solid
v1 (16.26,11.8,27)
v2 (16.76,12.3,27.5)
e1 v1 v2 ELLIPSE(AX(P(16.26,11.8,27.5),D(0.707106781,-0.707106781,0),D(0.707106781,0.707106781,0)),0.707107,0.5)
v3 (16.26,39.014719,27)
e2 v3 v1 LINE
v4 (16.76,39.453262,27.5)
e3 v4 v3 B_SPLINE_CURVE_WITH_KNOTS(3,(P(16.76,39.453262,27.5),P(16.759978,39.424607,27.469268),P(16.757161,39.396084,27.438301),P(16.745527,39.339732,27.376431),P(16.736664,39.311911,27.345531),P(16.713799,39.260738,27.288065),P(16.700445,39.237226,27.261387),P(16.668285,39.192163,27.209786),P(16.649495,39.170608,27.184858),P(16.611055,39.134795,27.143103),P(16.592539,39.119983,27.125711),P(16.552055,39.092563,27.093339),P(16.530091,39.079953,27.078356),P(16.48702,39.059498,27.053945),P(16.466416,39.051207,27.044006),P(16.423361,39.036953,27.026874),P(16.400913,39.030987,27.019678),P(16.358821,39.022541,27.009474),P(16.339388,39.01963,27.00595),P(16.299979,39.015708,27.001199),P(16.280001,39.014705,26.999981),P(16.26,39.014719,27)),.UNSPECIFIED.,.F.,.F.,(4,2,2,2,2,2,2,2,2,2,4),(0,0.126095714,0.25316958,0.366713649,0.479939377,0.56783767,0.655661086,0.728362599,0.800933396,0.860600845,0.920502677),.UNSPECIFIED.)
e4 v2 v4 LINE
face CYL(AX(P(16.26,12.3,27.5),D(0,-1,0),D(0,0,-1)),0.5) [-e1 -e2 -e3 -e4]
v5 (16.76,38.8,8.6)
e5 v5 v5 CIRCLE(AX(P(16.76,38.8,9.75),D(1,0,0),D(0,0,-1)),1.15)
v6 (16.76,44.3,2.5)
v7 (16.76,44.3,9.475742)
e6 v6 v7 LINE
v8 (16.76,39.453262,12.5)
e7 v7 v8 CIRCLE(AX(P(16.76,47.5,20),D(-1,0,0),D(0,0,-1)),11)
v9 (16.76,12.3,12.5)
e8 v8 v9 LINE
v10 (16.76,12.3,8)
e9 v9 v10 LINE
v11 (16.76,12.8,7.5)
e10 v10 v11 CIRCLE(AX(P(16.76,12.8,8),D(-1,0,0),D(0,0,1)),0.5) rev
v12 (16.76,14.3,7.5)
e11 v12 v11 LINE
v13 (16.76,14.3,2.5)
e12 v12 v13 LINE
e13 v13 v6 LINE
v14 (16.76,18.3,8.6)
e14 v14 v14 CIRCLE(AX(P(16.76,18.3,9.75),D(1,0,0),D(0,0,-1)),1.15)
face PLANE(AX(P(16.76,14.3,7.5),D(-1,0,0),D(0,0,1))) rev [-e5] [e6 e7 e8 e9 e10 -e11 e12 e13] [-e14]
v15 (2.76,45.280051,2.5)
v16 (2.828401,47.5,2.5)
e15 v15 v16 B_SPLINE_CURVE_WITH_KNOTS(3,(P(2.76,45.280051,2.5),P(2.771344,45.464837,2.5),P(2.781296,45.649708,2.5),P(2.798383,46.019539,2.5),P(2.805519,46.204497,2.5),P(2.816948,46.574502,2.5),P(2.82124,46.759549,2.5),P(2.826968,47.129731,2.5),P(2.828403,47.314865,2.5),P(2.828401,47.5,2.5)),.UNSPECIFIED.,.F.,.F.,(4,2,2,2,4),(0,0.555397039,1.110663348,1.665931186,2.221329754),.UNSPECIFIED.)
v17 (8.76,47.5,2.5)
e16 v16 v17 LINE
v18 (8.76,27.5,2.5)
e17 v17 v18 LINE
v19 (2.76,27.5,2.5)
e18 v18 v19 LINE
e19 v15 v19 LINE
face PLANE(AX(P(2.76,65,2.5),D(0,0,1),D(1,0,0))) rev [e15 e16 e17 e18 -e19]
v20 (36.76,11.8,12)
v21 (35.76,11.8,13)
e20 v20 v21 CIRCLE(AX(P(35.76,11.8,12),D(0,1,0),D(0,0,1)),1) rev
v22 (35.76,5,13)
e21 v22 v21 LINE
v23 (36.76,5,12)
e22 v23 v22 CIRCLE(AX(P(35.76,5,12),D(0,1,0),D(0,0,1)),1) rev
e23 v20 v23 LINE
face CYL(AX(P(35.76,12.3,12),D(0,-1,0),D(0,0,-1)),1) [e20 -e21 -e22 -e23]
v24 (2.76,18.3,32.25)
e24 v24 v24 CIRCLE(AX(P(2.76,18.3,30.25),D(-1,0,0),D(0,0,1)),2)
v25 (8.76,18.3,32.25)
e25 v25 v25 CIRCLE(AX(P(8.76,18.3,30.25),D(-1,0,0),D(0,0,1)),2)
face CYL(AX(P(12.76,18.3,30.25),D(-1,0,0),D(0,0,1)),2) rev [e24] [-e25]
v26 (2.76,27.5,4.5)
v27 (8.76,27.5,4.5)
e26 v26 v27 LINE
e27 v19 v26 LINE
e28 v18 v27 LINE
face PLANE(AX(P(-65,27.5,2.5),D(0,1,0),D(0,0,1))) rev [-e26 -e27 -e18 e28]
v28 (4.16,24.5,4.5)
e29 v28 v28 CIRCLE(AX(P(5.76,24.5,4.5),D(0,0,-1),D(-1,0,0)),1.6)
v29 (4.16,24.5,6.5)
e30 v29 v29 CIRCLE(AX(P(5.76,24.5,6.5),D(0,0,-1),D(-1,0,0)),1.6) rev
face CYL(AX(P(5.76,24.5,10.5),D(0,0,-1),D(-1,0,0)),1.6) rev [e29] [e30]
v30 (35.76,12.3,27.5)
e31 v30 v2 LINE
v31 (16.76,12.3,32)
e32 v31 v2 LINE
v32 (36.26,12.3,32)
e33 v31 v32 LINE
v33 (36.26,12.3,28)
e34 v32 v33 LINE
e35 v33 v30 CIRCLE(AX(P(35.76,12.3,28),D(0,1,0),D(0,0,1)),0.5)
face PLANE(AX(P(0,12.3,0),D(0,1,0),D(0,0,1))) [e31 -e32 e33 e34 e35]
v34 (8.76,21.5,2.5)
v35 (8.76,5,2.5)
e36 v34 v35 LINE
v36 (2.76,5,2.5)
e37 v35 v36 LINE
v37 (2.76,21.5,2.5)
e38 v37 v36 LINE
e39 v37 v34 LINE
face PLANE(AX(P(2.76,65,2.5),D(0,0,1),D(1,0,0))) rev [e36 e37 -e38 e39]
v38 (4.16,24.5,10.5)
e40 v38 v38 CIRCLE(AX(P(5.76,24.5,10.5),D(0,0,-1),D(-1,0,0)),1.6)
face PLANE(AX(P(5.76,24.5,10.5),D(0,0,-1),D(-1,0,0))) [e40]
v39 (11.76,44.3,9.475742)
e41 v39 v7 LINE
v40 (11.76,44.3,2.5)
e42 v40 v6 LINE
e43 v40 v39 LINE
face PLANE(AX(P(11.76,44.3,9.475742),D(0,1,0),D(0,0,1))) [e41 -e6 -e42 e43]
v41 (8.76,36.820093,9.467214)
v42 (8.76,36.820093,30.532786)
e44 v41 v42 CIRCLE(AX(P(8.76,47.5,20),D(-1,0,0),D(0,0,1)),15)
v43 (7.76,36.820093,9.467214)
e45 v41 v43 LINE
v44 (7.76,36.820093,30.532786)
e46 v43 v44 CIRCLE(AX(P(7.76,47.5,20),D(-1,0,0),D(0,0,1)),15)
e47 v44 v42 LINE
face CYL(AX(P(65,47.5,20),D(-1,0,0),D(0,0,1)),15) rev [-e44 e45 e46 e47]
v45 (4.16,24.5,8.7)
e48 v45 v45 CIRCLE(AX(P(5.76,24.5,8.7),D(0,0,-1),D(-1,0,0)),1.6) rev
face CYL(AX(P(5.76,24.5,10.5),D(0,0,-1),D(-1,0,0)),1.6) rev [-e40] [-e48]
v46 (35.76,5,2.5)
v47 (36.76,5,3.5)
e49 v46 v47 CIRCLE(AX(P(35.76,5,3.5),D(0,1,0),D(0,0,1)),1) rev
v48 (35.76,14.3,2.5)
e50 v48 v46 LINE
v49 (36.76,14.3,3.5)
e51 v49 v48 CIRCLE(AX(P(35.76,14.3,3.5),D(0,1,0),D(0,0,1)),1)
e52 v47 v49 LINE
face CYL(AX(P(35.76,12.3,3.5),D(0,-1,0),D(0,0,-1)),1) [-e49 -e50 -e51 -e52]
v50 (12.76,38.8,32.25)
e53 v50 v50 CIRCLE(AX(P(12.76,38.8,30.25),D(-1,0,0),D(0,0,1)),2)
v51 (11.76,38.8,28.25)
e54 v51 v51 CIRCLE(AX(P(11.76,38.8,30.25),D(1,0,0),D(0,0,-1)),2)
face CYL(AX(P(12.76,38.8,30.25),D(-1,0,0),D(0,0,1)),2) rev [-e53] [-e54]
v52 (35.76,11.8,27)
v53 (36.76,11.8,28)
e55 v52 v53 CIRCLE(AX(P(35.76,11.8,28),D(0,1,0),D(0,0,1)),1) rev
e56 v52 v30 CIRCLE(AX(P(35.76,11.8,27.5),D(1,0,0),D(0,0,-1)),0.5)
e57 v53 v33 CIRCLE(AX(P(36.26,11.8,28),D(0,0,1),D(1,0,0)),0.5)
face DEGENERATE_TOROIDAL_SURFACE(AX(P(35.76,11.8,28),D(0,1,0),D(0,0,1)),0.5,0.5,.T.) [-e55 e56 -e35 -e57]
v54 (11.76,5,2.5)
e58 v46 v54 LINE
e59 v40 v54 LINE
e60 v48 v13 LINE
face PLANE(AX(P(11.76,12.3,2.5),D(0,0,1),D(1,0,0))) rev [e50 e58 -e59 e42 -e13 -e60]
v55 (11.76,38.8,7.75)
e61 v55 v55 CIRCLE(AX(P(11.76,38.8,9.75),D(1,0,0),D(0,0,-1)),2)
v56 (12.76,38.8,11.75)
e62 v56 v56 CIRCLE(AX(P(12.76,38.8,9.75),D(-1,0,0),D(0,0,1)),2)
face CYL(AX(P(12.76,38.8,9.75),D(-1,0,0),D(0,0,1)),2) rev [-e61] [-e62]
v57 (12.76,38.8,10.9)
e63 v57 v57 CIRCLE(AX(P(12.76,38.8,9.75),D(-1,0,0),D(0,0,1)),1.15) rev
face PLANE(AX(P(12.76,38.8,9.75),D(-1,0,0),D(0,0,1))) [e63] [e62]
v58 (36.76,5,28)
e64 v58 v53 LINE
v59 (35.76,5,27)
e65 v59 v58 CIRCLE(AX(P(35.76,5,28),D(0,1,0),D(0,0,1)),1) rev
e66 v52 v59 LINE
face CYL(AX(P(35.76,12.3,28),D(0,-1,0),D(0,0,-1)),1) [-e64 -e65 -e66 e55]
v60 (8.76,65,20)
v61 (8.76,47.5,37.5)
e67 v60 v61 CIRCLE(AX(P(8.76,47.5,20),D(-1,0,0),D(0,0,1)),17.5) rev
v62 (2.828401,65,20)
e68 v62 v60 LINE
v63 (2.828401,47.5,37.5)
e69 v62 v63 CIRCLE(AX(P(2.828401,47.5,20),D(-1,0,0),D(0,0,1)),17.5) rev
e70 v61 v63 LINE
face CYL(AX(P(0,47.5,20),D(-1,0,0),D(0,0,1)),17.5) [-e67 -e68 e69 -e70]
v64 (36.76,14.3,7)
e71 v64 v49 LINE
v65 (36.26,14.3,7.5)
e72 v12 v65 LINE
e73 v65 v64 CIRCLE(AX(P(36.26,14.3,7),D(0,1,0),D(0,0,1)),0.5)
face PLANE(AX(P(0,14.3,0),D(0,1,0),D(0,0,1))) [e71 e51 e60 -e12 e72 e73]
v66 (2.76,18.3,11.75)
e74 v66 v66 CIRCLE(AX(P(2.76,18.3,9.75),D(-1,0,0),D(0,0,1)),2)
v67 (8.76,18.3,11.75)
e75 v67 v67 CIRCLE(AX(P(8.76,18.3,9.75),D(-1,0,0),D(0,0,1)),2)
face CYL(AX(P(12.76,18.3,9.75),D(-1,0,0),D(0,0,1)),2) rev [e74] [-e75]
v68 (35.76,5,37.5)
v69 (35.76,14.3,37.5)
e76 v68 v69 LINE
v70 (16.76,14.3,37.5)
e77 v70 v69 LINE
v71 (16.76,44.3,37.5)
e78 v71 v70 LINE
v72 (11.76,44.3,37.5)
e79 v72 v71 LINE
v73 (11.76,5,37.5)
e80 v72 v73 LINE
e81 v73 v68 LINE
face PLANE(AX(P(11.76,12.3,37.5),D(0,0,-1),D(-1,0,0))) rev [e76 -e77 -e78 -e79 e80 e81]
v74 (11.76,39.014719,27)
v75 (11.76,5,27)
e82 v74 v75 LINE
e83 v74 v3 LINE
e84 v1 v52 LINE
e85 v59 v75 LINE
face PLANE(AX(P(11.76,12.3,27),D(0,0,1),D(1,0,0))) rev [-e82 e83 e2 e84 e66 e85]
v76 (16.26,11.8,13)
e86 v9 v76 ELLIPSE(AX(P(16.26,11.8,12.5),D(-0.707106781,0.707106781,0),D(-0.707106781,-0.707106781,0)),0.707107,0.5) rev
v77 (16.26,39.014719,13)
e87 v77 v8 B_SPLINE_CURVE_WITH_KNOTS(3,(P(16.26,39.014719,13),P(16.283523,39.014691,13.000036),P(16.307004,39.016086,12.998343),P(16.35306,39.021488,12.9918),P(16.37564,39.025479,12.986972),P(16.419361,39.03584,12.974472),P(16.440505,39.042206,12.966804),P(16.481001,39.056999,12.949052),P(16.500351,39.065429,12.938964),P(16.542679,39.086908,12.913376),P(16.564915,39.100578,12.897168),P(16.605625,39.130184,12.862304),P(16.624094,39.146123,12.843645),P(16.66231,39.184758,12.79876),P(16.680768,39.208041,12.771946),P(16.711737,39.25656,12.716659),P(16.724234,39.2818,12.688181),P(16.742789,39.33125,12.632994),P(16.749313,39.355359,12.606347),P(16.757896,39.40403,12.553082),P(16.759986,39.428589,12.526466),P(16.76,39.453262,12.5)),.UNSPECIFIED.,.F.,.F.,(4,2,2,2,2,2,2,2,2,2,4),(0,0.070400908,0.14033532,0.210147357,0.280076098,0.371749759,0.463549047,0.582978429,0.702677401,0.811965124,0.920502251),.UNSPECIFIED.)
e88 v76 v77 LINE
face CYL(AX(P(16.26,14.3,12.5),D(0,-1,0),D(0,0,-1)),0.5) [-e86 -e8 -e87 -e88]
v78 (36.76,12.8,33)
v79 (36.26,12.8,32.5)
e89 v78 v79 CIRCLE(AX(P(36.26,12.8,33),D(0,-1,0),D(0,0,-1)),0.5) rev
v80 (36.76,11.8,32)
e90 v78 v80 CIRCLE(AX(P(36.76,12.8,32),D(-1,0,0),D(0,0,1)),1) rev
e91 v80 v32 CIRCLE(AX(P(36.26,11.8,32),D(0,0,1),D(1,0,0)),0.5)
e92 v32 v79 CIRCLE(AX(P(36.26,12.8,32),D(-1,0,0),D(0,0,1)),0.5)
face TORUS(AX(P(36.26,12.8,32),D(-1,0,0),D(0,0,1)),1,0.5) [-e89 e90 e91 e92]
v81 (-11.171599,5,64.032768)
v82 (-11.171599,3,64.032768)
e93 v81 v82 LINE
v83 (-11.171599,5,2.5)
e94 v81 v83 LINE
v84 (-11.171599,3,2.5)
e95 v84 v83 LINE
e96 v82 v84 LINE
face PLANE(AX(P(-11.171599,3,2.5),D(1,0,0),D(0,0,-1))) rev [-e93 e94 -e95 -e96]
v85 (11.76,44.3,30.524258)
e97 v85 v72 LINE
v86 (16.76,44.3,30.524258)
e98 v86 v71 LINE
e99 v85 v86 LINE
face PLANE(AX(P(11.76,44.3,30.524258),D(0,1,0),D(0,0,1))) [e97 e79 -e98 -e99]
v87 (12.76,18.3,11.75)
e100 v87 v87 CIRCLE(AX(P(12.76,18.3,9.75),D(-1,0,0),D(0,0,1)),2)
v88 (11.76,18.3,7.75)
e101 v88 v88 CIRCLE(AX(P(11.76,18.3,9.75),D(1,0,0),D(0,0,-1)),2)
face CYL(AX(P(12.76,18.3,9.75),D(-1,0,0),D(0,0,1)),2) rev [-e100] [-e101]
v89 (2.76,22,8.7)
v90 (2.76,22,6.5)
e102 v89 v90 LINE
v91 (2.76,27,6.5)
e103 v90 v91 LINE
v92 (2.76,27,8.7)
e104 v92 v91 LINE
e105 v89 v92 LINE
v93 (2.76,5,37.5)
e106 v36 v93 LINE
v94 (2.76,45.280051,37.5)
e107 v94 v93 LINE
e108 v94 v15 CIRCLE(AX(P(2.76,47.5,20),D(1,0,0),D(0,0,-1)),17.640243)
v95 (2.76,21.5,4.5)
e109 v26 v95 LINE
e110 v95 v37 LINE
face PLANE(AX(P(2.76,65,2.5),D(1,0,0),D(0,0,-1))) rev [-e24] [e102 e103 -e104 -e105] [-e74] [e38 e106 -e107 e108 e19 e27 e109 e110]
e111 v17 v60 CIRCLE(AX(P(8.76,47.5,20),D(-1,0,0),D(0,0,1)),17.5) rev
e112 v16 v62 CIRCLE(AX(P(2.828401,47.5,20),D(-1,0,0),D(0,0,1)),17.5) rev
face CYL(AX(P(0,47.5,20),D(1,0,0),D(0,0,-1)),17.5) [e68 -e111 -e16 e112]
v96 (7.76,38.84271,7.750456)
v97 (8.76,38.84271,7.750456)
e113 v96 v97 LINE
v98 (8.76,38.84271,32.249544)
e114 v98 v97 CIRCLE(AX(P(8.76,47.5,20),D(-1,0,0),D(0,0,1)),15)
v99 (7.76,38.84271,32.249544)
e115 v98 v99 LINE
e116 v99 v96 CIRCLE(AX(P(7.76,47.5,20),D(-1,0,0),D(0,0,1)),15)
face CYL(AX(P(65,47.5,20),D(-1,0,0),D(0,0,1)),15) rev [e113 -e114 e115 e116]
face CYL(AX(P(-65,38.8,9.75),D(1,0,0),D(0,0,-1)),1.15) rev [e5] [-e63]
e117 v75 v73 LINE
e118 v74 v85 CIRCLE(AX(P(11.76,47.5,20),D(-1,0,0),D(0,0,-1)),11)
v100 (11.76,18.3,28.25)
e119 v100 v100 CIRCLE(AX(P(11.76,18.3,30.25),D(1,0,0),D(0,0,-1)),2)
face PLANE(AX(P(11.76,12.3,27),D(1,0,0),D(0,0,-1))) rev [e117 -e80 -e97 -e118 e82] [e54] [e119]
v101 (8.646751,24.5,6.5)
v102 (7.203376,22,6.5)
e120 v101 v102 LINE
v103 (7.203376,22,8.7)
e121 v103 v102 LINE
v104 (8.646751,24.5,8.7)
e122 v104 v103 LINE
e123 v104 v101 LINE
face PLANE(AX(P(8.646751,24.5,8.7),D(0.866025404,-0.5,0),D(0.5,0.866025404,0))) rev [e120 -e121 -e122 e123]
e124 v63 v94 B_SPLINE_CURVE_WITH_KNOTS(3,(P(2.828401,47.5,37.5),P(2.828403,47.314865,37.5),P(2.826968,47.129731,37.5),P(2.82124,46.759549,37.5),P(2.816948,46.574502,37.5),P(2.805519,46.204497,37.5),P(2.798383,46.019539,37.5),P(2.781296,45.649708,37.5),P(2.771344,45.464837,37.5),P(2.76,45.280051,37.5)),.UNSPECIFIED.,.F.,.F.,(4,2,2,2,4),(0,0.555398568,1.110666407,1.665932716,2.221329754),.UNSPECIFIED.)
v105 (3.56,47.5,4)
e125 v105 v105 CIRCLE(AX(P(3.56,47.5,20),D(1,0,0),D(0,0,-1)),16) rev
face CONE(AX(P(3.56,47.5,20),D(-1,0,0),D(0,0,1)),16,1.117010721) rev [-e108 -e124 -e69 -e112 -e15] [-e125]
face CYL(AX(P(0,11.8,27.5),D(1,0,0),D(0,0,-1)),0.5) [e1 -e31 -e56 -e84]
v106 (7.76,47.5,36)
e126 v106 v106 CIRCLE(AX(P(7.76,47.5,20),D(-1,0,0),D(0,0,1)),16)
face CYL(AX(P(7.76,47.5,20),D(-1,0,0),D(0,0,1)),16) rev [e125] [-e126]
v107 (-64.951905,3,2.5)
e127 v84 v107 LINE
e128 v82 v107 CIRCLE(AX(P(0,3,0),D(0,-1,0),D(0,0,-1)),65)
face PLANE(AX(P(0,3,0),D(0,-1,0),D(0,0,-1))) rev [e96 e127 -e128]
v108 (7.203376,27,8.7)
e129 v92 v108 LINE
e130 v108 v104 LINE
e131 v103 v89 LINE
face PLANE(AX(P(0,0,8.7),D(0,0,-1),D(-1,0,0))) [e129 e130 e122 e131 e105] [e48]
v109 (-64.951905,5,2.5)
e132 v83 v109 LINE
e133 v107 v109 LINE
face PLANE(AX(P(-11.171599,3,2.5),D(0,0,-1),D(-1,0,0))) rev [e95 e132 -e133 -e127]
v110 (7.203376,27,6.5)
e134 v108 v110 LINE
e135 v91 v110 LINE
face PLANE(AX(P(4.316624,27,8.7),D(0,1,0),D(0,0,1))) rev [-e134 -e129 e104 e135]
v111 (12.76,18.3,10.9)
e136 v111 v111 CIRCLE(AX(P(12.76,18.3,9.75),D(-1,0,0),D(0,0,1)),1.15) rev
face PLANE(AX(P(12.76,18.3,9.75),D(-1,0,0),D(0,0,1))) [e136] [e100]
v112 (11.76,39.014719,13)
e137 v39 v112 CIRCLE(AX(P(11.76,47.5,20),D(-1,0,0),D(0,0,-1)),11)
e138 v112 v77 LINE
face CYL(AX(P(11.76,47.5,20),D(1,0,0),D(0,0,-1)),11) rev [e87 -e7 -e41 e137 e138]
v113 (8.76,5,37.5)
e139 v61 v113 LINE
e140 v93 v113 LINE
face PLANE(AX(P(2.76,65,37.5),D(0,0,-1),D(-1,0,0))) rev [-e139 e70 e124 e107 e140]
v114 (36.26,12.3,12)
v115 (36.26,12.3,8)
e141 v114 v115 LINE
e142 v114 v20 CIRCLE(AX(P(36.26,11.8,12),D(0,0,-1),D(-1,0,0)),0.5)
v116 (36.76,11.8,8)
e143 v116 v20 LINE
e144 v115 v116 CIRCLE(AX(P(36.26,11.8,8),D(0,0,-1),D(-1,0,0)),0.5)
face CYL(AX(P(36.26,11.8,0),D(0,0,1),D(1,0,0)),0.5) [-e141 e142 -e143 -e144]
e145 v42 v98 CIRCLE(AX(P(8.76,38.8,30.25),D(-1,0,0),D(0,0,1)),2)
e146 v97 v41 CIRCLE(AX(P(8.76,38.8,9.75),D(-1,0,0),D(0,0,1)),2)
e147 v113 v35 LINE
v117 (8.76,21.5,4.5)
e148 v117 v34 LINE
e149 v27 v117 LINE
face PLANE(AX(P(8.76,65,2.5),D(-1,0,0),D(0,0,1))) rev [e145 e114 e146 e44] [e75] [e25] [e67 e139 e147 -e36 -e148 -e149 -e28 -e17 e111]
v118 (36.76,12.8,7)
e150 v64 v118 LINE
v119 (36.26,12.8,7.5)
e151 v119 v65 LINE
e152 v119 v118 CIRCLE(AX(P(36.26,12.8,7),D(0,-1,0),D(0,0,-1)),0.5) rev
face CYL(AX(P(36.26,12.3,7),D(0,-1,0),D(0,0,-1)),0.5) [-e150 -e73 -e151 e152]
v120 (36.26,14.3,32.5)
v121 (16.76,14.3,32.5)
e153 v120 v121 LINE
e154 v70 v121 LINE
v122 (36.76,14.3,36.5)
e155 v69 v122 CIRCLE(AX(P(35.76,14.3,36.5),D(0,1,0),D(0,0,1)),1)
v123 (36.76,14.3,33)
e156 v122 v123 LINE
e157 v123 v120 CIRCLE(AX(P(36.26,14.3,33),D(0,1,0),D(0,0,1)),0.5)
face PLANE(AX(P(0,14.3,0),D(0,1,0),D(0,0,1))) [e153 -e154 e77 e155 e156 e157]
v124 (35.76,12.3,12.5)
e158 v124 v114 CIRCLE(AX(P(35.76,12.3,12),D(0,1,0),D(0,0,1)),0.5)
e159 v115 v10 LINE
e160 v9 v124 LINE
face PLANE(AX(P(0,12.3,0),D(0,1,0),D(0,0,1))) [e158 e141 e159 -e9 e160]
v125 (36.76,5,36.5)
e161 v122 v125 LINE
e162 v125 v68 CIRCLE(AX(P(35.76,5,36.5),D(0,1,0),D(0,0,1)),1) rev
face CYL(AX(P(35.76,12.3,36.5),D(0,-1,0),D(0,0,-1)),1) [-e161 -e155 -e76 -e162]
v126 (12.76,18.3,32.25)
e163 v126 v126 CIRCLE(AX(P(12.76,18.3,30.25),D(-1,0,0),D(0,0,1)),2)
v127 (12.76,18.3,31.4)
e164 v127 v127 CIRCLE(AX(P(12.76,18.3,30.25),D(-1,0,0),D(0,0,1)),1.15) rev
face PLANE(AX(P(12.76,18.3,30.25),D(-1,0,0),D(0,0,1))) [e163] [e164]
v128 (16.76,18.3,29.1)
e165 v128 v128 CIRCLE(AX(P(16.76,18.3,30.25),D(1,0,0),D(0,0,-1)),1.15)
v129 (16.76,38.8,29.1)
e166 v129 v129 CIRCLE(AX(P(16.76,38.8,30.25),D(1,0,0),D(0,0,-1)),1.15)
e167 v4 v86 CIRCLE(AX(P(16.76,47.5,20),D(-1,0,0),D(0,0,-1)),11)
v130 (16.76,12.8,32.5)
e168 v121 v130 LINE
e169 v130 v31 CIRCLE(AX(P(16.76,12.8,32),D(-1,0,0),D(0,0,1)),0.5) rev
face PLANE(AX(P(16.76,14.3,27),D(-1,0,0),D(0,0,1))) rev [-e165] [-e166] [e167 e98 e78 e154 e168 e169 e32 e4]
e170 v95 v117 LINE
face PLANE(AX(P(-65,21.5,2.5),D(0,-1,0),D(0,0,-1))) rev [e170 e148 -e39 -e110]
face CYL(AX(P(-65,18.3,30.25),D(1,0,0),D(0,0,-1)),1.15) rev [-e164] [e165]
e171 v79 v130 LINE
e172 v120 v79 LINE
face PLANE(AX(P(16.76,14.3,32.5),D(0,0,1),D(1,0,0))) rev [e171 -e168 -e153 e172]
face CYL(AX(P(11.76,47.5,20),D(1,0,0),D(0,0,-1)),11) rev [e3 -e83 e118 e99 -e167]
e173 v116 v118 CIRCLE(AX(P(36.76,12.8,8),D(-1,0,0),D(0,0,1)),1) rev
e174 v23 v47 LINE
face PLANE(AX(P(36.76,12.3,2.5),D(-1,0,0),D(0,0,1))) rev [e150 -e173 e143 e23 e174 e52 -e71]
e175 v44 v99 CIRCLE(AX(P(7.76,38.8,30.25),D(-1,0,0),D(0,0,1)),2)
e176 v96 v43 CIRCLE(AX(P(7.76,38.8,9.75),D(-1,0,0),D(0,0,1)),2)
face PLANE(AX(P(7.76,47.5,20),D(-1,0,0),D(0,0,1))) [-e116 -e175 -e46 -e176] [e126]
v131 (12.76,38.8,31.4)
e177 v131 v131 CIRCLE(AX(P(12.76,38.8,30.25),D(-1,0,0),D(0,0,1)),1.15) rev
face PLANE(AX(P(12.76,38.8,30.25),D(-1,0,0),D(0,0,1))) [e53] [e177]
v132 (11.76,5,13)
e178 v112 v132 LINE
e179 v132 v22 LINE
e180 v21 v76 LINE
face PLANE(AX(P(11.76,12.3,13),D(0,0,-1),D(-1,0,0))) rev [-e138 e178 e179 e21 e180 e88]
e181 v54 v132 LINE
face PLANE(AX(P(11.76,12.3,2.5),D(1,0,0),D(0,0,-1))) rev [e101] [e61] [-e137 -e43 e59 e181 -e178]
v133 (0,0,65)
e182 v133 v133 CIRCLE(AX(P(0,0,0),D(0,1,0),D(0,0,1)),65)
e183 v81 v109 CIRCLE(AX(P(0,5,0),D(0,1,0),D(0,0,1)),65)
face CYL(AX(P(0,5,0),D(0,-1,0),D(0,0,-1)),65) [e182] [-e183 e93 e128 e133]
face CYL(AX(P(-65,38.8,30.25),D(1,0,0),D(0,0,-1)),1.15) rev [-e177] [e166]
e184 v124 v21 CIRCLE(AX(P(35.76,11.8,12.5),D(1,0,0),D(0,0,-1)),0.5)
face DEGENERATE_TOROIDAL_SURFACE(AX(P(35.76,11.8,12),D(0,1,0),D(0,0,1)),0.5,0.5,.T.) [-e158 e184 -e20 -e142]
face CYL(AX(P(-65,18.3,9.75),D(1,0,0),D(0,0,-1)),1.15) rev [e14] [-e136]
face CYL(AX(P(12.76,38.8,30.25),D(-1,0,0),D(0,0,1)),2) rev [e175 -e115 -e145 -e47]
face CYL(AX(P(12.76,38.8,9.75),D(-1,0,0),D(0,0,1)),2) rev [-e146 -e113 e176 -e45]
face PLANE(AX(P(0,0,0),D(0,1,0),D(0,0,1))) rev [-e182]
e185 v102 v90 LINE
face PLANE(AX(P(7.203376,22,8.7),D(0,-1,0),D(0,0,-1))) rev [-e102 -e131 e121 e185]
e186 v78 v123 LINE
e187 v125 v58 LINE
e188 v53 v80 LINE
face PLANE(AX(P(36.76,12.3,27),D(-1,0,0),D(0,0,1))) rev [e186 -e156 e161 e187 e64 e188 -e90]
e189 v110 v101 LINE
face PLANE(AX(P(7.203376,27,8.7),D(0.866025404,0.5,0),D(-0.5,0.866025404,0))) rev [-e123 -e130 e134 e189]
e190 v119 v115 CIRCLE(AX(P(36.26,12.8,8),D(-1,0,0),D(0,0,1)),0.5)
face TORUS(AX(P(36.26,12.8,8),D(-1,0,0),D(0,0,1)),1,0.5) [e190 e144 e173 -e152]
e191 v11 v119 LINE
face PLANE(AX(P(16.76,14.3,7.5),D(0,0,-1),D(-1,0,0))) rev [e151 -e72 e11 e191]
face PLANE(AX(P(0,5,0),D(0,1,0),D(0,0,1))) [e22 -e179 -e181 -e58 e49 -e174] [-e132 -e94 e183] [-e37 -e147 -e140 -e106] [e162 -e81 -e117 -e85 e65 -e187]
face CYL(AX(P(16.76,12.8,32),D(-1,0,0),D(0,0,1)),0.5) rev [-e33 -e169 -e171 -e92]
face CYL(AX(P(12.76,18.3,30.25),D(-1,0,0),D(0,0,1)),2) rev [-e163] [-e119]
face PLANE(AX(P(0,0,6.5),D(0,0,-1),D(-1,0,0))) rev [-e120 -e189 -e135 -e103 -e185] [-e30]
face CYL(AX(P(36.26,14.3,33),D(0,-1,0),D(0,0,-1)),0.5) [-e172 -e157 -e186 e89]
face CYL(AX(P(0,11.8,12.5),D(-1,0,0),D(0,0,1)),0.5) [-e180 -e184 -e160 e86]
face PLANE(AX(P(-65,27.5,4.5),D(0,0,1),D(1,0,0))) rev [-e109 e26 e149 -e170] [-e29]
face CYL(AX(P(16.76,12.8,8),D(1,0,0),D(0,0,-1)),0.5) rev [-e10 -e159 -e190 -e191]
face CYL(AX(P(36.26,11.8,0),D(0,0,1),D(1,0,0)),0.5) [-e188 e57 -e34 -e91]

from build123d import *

# Parameters (mm, degrees)
SKETCH_1_R           = 65
EXTRUDE_1_DEPTH      = 5
SKETCH_2_W           = 6
SKETCH_2_H           = 35
EXTRUDE_2_DEPTH      = 60
FILLET_1_R           = 17.5
SKETCH_3_R           = 16
CUT_EXTRUDE_1_DEPTH  = 5
CHAMFER_1_SIZE       = 1.640243073
CHAMFER_1_SIZE_2     = 0.8
SKETCH_4_R           = 15
CUT_EXTRUDE_2_DEPTH  = 118.234882236
SKETCH_6_W           = 2
SKETCH_6_H           = 6
CUT_EXTRUDE_3_DEPTH  = 118.858124934
SKETCH_8_R           = 1.6
CUT_EXTRUDE_5_DEPTH  = 6
CUT_EXTRUDE_START    = -2
CUT_EXTRUDE_8_DEPTH  = 2.2
SKETCH_11_W          = 25
SKETCH_11_H          = 10.5
EXTRUDE_4_DEPTH      = 7.3
EXTRUDE_5_DEPTH      = 2
FILLET_3_R           = 1
EXTRUDE_6_DEPTH      = 5
SKETCH_14_R          = 1.15
CUT_EXTRUDE_10_DEPTH = 124.023158848
FILLET_2_R           = 0.5
SKETCH_15_R          = 2
CUT_EXTRUDE_11_DEPTH = 10
SKETCH_16_W          = 53.828401117
SKETCH_16_H          = 62.5
CUT_EXTRUDE_12_DEPTH = 2


# Some blends are built 0.0001 mm under size
with BuildPart() as part:
    # 스케치1 → 보스-돌출1 (new body)
    with BuildSketch(Plane(origin=(0, 0, 0), x_dir=(1, 0, 0), z_dir=(0, 1, 0))):
        with Locations(Location((0, 0, 0), (0, 0, 270))):
            Circle(SKETCH_1_R)
    extrude(amount=EXTRUDE_1_DEPTH)

    # 스케치2 → 보스-돌출2 (add)
    with BuildSketch(Plane(origin=(0, 5, 0), x_dir=(1, 0, 0), z_dir=(0, 1, 0))):
        with Locations((5.76, -20)):
            Rectangle(SKETCH_2_W, SKETCH_2_H)
    extrude(amount=EXTRUDE_2_DEPTH)

    # 필렛1
    fillet_1_edges = [part.edges().sort_by_distance(p)[0] for p in [
        (5.76, 65, 2.5),
        (5.76, 65, 37.5),
    ]]
    fillet(fillet_1_edges, radius=FILLET_1_R - 0.0001)  # a hair under: the kernel refuses the full size

    # 스케치3 → 컷-돌출1 (cut)
    with BuildSketch(Plane.ZY.offset(-2.76)):
        with Locations((20, 47.5)):
            Circle(SKETCH_3_R)
    extrude(amount=-CUT_EXTRUDE_1_DEPTH, mode=Mode.SUBTRACT)

    # 모따기1
    # the kernel refuses this chamfer: 1.640243073, 0.8 mm, written as the material it takes off along each edge
    with BuildSketch(Plane(origin=(2.76, 47.5, 20), x_dir=(0, 0, 1), z_dir=(0, -1, 0))) as chamfer_1_piece_1:
        Polygon((16 + CHAMFER_1_SIZE, 0), (16, -CHAMFER_1_SIZE_2), (16, 0), align=None)
    revolve(axis=Axis((2.76, 47.5, 20), (-1, 0, 0)), mode=Mode.SUBTRACT)

    # 스케치4 → 컷-돌출2 (cut, through all)
    with BuildSketch(Plane.ZY.offset(-7.76)):
        with Locations((20, 47.5)):
            Circle(SKETCH_4_R)
    extrude(amount=-CUT_EXTRUDE_2_DEPTH, mode=Mode.SUBTRACT)

    # 스케치6 → 컷-돌출3 (cut, through all)
    with BuildSketch(Plane(origin=(8.76, 0, 0), x_dir=(0, 0, -1), z_dir=(1, 0, 0))):
        with Locations((-3.5, 24.5)):
            Rectangle(SKETCH_6_W, SKETCH_6_H)
    extrude(amount=-CUT_EXTRUDE_3_DEPTH, mode=Mode.SUBTRACT)

    # 스케치8 → 컷-돌출5 (cut)
    with BuildSketch(Plane(origin=(0, 0, 4.5), x_dir=(-1, 0, 0), z_dir=(0, 0, -1))):
        with Locations((-5.76, 24.5)):
            Circle(SKETCH_8_R)
    extrude(amount=-CUT_EXTRUDE_5_DEPTH, mode=Mode.SUBTRACT)

    # 스케치9 → 컷-돌출8 (cut)
    with BuildSketch(Plane(origin=(0, 0, 4.5), x_dir=(-1, 0, 0), z_dir=(0, 0, -1)).offset(CUT_EXTRUDE_START)):
        Polygon((-4.316624327, 27), (-7.203375673, 27), (-8.646751346, 24.5), (-7.203375673, 22), (-4.316624327, 22), (-2.76, 22), (-2.76, 27), align=None)
    extrude(amount=-CUT_EXTRUDE_8_DEPTH, mode=Mode.SUBTRACT)

    # 스케치11 → 보스-돌출4 (add)
    with BuildSketch(Plane(origin=(0, 5, 0), x_dir=(1, 0, 0), z_dir=(0, 1, 0))):
        with Locations((24.26, -7.75)):
            Rectangle(SKETCH_11_W, SKETCH_11_H)
        with Locations((24.26, -32.25)):
            Rectangle(SKETCH_11_W, SKETCH_11_H)
    extrude(amount=EXTRUDE_4_DEPTH)

    # 스케치12 → 보스-돌출5 (add)
    with BuildSketch(Plane(origin=(0, 12.3, 0), x_dir=(1, 0, 0), z_dir=(0, 1, 0))):
        Polygon((16.76, -32.5), (36.76, -32.5), (36.76, -37.5), (11.76, -37.5), (11.76, -27), (16.76, -27), align=None)
        Polygon((11.76, -2.5), (36.76, -2.5), (36.76, -7.5), (16.76, -7.5), (16.76, -13), (11.76, -13), align=None)
    extrude(amount=EXTRUDE_5_DEPTH)

    # 필렛3
    fillet_3_edges = [part.edges().sort_by_distance(p)[0] for p in [
        (36.76, 9.65, 2.5),
        (36.76, 9.65, 37.5),
        (36.76, 8.65, 27),
        (36.76, 8.65, 13),
    ]]
    fillet(fillet_3_edges, radius=FILLET_3_R)

    # 스케치13 → 보스-돌출6 (add)
    with BuildSketch(Plane(origin=(16.76, 0, 0), x_dir=(0, 0, -1), z_dir=(1, 0, 0))):
        with BuildLine():
            Line((-27, 14.3), (-37.5, 14.3))
            Line((-37.5, 14.3), (-37.5, 44.3))
            Line((-37.5, 44.3), (-30.524257694, 44.3))
            ThreePointArc((-30.524257694, 44.3), (-29.151964364, 41.397414624), (-27, 39.014718626))
            Line((-27, 39.014718626), (-27, 14.3))
        make_face()
        with BuildLine():
            Line((-13, 14.3), (-2.5, 14.3))
            Line((-2.5, 14.3), (-2.5, 44.3))
            Line((-2.5, 44.3), (-9.475742306, 44.3))
            ThreePointArc((-9.475742306, 44.3), (-10.848035636, 41.397414624), (-13, 39.014718626))
            Line((-13, 39.014718626), (-13, 14.3))
        make_face()
    extrude(amount=-EXTRUDE_6_DEPTH)

    # 스케치14 → 컷-돌출10 (cut, through all)
    with BuildSketch(Plane(origin=(16.76, 0, 0), x_dir=(0, 0, -1), z_dir=(1, 0, 0))):
        with Locations((-30.25, 18.3)):
            Circle(SKETCH_14_R)
        with Locations((-9.75, 18.3)):
            Circle(SKETCH_14_R)
        with Locations((-9.75, 38.8)):
            Circle(SKETCH_14_R)
        with Locations((-30.25, 38.8)):
            Circle(SKETCH_14_R)
    extrude(amount=-CUT_EXTRUDE_10_DEPTH, mode=Mode.SUBTRACT)

    # 필렛2
    fillet_2_edges = [part.edges().sort_by_distance(p)[0] for p in [
        (26.26, 12.3, 13),
        (16.76, 25.657359313, 13),
        (26.76, 12.3, 7.5),
        (36.76, 13.3, 7.5),
        (36.76, 12.3, 30.25),
        (16.76, 25.657359313, 27),
        (26.76, 12.3, 32.5),
        (36.76, 13.3, 32.5),
        (26.26, 12.3, 27),
        (36.467106781, 12.3, 27.292893219),
        (36.76, 12.3, 9.75),
        (36.467106781, 12.3, 12.707106781),
    ]]
    fillet(fillet_2_edges, radius=FILLET_2_R)

    # 스케치15 → 컷-돌출11 (cut)
    with BuildSketch(Plane.ZY.offset(-2.76)):
        with Locations((9.75, 38.8)):
            Circle(SKETCH_15_R)
        with Locations((30.25, 38.8)):
            Circle(SKETCH_15_R)
        with Locations((9.75, 18.3)):
            Circle(SKETCH_15_R)
        with Locations((30.25, 18.3)):
            Circle(SKETCH_15_R)
    extrude(amount=-CUT_EXTRUDE_11_DEPTH, mode=Mode.SUBTRACT)

    # 스케치16 → 컷-돌출12 (cut)
    with BuildSketch(Plane(origin=(0, 5, 0), x_dir=(1, 0, 0), z_dir=(0, 1, 0))):
        with Locations((-38.085799442, -33.75)):
            Rectangle(SKETCH_16_W, SKETCH_16_H)
    extrude(amount=-CUT_EXTRUDE_12_DEPTH, mode=Mode.SUBTRACT)


solid = part.part
